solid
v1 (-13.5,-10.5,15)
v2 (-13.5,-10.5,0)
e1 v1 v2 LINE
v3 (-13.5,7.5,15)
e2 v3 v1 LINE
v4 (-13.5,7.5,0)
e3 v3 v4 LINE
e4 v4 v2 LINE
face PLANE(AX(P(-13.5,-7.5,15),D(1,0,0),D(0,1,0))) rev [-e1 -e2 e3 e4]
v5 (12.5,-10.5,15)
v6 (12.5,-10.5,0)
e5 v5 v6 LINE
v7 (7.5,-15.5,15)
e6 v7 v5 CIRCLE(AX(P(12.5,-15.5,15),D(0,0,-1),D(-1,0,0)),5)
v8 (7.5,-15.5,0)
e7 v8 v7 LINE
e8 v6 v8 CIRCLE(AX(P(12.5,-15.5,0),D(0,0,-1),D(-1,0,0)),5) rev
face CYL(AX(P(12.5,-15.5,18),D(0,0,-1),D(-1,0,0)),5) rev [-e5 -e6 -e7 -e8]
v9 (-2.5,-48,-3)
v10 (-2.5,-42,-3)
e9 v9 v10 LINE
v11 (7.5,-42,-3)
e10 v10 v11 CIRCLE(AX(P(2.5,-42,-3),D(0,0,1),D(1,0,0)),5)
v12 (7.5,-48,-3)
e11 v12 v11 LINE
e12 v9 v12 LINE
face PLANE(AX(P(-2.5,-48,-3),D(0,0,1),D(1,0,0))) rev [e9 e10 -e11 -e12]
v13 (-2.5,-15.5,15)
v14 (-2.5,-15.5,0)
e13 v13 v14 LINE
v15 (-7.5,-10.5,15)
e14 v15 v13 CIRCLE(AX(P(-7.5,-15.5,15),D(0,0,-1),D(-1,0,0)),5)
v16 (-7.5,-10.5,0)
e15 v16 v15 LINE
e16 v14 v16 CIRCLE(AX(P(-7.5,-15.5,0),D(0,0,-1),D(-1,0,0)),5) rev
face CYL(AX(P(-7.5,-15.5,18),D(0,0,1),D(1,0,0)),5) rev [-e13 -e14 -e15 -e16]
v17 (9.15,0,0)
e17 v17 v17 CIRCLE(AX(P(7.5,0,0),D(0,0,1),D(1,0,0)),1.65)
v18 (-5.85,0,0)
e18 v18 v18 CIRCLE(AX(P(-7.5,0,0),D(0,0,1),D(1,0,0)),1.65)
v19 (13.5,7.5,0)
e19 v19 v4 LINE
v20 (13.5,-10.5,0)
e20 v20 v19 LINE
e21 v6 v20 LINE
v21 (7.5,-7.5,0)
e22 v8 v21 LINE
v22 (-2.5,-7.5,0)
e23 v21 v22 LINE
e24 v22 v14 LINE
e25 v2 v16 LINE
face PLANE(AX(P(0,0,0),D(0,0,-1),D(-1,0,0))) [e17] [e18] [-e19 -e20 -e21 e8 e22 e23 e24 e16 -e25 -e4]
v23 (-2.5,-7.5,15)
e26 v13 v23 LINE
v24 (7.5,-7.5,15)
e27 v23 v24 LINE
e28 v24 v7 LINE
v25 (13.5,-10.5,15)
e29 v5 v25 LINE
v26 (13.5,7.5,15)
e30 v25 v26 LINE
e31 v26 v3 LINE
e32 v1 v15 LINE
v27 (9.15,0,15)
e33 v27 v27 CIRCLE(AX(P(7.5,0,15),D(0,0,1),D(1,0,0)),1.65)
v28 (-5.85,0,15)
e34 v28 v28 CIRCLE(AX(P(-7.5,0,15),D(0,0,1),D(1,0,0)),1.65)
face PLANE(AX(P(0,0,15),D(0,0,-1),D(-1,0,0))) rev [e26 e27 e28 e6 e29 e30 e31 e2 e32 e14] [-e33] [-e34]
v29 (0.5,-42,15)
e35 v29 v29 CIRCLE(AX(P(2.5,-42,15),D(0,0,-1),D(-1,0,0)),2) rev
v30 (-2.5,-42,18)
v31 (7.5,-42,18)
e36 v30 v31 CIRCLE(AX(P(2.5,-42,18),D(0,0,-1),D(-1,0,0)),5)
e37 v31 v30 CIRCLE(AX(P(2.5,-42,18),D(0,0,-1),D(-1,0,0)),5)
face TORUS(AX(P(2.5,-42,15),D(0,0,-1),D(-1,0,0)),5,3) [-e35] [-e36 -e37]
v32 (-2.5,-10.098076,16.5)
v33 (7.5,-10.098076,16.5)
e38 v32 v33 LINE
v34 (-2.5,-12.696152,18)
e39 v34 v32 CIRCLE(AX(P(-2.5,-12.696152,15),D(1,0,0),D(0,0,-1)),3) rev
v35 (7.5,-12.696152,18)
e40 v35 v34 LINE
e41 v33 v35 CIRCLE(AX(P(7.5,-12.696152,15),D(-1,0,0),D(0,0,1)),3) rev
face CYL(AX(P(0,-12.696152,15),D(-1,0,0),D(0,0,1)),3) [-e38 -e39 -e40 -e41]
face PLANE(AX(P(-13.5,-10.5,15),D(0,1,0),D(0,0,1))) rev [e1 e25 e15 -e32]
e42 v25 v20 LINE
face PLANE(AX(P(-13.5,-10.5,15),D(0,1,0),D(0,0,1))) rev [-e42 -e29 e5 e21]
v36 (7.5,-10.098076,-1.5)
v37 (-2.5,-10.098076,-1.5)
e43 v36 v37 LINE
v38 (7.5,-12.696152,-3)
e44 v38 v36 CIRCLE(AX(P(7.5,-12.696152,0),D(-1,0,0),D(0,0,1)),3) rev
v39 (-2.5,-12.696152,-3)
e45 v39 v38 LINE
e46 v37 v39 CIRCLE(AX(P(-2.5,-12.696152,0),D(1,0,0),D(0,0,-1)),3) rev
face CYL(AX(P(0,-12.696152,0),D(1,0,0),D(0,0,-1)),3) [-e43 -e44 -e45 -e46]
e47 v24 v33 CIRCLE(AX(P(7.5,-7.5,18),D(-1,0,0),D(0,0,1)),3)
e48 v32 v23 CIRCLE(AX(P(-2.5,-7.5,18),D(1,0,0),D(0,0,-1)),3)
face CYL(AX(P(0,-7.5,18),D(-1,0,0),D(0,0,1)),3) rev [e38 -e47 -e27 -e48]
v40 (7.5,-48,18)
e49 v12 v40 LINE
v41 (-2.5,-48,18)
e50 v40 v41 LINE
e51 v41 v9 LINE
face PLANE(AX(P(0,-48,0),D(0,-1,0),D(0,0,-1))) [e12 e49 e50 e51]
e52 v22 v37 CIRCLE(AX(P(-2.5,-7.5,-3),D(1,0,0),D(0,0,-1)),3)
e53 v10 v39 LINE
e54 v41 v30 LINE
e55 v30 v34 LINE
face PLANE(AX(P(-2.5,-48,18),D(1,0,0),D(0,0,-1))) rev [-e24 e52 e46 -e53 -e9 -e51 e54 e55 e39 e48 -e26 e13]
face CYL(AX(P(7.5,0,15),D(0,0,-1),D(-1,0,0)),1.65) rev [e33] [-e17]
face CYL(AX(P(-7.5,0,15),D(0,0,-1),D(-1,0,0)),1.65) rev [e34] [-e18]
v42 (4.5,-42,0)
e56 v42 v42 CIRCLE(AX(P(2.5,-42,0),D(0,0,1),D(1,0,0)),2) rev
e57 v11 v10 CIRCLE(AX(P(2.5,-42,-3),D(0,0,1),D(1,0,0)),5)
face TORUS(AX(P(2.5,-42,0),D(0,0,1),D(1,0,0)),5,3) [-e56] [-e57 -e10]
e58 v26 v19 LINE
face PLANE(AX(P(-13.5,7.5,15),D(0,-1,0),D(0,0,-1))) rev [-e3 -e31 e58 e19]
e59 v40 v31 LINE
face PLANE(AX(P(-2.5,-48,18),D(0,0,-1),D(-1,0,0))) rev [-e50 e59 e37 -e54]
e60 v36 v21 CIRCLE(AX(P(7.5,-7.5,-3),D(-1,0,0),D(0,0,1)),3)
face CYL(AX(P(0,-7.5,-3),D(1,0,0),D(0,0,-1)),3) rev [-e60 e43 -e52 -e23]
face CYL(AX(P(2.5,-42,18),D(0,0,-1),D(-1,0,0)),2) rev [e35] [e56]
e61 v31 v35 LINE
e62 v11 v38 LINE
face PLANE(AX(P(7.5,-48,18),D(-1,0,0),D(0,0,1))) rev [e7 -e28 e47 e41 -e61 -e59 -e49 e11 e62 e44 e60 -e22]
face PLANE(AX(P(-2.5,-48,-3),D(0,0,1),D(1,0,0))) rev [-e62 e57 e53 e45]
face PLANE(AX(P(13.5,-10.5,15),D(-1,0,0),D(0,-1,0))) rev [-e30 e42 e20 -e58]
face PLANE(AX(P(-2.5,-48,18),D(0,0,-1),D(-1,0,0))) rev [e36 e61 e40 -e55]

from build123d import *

# Parameters (mm, degrees)
SKETCH_2_R               = 1.65
EXTRUDE_1_DEPTH          = 15
SKETCH_4_W               = 10
SKETCH_4_H               = 21
EXTRUDE_2_DEPTH          = 37.5
CUT_EXTRUDE_1_DEPTH      = 54.011791141
CUT_EXTRUDE_1_DEPTH_BACK = 54.011791141
SKETCH_5_R               = 2
FILLET_1_R               = 3
FILLET_2_R               = 3
FILLET_3_R               = 5


with BuildPart() as part:
    # 草图2 → 凸台-拉伸1 (new body)
    with BuildSketch(Plane.XY):
        Polygon((-13.5, -7.5), (-13.5, 7.5), (13.5, 7.5), (13.5, -7.5), (13.5, -10.5), (-13.5, -10.5), align=None)
        with Locations((7.5, 0)):
            Circle(SKETCH_2_R, mode=Mode.SUBTRACT)
        with Locations((-7.5, 0)):
            Circle(SKETCH_2_R, mode=Mode.SUBTRACT)
    extrude(amount=EXTRUDE_1_DEPTH)

    # 草图4 → 凸台-拉伸2 (add)
    with BuildSketch(Plane.XZ.offset(10.5)):
        with Locations((2.5, 7.5)):
            Rectangle(SKETCH_4_W, SKETCH_4_H)
    extrude(amount=EXTRUDE_2_DEPTH)

    # 草图5 → 切除-拉伸1 (cut, two sides: drawn at the far end of the back side and taken through both)
    with BuildSketch(Plane(origin=(0, 0, 0), x_dir=(-1, 0, 0), z_dir=(0, 0, -1)).offset(-CUT_EXTRUDE_1_DEPTH_BACK)):
        with Locations((-2.5, -42)):
            Circle(SKETCH_5_R)
    extrude(amount=CUT_EXTRUDE_1_DEPTH + CUT_EXTRUDE_1_DEPTH_BACK, mode=Mode.SUBTRACT)

    # 圆角1
    fillet_1_edges = [part.edges().sort_by_distance(p)[0] for p in [
        (4.5, -42, 18),
        (2.5, -10.5, 0),
        (2.5, -10.5, 15),
        (4.5, -42, -3),
    ]]
    fillet(fillet_1_edges, radius=FILLET_1_R - 0.0001)  # a hair under: the kernel refuses the full size

    # 圆角2
    fillet_2_edges = [part.edges().sort_by_distance(p)[0] for p in [
        (2.5, -10.5, -3),
        (2.5, -10.5, 18),
    ]]
    fillet(fillet_2_edges, radius=FILLET_2_R)

    # 圆角3
    fillet_3_edges = [part.edges().sort_by_distance(p)[0] for p in [
        (7.5, -10.5, 7.5),
        (-2.5, -10.5, 7.5),
    ]]
    fillet(fillet_3_edges, radius=FILLET_3_R)


solid = part.part
